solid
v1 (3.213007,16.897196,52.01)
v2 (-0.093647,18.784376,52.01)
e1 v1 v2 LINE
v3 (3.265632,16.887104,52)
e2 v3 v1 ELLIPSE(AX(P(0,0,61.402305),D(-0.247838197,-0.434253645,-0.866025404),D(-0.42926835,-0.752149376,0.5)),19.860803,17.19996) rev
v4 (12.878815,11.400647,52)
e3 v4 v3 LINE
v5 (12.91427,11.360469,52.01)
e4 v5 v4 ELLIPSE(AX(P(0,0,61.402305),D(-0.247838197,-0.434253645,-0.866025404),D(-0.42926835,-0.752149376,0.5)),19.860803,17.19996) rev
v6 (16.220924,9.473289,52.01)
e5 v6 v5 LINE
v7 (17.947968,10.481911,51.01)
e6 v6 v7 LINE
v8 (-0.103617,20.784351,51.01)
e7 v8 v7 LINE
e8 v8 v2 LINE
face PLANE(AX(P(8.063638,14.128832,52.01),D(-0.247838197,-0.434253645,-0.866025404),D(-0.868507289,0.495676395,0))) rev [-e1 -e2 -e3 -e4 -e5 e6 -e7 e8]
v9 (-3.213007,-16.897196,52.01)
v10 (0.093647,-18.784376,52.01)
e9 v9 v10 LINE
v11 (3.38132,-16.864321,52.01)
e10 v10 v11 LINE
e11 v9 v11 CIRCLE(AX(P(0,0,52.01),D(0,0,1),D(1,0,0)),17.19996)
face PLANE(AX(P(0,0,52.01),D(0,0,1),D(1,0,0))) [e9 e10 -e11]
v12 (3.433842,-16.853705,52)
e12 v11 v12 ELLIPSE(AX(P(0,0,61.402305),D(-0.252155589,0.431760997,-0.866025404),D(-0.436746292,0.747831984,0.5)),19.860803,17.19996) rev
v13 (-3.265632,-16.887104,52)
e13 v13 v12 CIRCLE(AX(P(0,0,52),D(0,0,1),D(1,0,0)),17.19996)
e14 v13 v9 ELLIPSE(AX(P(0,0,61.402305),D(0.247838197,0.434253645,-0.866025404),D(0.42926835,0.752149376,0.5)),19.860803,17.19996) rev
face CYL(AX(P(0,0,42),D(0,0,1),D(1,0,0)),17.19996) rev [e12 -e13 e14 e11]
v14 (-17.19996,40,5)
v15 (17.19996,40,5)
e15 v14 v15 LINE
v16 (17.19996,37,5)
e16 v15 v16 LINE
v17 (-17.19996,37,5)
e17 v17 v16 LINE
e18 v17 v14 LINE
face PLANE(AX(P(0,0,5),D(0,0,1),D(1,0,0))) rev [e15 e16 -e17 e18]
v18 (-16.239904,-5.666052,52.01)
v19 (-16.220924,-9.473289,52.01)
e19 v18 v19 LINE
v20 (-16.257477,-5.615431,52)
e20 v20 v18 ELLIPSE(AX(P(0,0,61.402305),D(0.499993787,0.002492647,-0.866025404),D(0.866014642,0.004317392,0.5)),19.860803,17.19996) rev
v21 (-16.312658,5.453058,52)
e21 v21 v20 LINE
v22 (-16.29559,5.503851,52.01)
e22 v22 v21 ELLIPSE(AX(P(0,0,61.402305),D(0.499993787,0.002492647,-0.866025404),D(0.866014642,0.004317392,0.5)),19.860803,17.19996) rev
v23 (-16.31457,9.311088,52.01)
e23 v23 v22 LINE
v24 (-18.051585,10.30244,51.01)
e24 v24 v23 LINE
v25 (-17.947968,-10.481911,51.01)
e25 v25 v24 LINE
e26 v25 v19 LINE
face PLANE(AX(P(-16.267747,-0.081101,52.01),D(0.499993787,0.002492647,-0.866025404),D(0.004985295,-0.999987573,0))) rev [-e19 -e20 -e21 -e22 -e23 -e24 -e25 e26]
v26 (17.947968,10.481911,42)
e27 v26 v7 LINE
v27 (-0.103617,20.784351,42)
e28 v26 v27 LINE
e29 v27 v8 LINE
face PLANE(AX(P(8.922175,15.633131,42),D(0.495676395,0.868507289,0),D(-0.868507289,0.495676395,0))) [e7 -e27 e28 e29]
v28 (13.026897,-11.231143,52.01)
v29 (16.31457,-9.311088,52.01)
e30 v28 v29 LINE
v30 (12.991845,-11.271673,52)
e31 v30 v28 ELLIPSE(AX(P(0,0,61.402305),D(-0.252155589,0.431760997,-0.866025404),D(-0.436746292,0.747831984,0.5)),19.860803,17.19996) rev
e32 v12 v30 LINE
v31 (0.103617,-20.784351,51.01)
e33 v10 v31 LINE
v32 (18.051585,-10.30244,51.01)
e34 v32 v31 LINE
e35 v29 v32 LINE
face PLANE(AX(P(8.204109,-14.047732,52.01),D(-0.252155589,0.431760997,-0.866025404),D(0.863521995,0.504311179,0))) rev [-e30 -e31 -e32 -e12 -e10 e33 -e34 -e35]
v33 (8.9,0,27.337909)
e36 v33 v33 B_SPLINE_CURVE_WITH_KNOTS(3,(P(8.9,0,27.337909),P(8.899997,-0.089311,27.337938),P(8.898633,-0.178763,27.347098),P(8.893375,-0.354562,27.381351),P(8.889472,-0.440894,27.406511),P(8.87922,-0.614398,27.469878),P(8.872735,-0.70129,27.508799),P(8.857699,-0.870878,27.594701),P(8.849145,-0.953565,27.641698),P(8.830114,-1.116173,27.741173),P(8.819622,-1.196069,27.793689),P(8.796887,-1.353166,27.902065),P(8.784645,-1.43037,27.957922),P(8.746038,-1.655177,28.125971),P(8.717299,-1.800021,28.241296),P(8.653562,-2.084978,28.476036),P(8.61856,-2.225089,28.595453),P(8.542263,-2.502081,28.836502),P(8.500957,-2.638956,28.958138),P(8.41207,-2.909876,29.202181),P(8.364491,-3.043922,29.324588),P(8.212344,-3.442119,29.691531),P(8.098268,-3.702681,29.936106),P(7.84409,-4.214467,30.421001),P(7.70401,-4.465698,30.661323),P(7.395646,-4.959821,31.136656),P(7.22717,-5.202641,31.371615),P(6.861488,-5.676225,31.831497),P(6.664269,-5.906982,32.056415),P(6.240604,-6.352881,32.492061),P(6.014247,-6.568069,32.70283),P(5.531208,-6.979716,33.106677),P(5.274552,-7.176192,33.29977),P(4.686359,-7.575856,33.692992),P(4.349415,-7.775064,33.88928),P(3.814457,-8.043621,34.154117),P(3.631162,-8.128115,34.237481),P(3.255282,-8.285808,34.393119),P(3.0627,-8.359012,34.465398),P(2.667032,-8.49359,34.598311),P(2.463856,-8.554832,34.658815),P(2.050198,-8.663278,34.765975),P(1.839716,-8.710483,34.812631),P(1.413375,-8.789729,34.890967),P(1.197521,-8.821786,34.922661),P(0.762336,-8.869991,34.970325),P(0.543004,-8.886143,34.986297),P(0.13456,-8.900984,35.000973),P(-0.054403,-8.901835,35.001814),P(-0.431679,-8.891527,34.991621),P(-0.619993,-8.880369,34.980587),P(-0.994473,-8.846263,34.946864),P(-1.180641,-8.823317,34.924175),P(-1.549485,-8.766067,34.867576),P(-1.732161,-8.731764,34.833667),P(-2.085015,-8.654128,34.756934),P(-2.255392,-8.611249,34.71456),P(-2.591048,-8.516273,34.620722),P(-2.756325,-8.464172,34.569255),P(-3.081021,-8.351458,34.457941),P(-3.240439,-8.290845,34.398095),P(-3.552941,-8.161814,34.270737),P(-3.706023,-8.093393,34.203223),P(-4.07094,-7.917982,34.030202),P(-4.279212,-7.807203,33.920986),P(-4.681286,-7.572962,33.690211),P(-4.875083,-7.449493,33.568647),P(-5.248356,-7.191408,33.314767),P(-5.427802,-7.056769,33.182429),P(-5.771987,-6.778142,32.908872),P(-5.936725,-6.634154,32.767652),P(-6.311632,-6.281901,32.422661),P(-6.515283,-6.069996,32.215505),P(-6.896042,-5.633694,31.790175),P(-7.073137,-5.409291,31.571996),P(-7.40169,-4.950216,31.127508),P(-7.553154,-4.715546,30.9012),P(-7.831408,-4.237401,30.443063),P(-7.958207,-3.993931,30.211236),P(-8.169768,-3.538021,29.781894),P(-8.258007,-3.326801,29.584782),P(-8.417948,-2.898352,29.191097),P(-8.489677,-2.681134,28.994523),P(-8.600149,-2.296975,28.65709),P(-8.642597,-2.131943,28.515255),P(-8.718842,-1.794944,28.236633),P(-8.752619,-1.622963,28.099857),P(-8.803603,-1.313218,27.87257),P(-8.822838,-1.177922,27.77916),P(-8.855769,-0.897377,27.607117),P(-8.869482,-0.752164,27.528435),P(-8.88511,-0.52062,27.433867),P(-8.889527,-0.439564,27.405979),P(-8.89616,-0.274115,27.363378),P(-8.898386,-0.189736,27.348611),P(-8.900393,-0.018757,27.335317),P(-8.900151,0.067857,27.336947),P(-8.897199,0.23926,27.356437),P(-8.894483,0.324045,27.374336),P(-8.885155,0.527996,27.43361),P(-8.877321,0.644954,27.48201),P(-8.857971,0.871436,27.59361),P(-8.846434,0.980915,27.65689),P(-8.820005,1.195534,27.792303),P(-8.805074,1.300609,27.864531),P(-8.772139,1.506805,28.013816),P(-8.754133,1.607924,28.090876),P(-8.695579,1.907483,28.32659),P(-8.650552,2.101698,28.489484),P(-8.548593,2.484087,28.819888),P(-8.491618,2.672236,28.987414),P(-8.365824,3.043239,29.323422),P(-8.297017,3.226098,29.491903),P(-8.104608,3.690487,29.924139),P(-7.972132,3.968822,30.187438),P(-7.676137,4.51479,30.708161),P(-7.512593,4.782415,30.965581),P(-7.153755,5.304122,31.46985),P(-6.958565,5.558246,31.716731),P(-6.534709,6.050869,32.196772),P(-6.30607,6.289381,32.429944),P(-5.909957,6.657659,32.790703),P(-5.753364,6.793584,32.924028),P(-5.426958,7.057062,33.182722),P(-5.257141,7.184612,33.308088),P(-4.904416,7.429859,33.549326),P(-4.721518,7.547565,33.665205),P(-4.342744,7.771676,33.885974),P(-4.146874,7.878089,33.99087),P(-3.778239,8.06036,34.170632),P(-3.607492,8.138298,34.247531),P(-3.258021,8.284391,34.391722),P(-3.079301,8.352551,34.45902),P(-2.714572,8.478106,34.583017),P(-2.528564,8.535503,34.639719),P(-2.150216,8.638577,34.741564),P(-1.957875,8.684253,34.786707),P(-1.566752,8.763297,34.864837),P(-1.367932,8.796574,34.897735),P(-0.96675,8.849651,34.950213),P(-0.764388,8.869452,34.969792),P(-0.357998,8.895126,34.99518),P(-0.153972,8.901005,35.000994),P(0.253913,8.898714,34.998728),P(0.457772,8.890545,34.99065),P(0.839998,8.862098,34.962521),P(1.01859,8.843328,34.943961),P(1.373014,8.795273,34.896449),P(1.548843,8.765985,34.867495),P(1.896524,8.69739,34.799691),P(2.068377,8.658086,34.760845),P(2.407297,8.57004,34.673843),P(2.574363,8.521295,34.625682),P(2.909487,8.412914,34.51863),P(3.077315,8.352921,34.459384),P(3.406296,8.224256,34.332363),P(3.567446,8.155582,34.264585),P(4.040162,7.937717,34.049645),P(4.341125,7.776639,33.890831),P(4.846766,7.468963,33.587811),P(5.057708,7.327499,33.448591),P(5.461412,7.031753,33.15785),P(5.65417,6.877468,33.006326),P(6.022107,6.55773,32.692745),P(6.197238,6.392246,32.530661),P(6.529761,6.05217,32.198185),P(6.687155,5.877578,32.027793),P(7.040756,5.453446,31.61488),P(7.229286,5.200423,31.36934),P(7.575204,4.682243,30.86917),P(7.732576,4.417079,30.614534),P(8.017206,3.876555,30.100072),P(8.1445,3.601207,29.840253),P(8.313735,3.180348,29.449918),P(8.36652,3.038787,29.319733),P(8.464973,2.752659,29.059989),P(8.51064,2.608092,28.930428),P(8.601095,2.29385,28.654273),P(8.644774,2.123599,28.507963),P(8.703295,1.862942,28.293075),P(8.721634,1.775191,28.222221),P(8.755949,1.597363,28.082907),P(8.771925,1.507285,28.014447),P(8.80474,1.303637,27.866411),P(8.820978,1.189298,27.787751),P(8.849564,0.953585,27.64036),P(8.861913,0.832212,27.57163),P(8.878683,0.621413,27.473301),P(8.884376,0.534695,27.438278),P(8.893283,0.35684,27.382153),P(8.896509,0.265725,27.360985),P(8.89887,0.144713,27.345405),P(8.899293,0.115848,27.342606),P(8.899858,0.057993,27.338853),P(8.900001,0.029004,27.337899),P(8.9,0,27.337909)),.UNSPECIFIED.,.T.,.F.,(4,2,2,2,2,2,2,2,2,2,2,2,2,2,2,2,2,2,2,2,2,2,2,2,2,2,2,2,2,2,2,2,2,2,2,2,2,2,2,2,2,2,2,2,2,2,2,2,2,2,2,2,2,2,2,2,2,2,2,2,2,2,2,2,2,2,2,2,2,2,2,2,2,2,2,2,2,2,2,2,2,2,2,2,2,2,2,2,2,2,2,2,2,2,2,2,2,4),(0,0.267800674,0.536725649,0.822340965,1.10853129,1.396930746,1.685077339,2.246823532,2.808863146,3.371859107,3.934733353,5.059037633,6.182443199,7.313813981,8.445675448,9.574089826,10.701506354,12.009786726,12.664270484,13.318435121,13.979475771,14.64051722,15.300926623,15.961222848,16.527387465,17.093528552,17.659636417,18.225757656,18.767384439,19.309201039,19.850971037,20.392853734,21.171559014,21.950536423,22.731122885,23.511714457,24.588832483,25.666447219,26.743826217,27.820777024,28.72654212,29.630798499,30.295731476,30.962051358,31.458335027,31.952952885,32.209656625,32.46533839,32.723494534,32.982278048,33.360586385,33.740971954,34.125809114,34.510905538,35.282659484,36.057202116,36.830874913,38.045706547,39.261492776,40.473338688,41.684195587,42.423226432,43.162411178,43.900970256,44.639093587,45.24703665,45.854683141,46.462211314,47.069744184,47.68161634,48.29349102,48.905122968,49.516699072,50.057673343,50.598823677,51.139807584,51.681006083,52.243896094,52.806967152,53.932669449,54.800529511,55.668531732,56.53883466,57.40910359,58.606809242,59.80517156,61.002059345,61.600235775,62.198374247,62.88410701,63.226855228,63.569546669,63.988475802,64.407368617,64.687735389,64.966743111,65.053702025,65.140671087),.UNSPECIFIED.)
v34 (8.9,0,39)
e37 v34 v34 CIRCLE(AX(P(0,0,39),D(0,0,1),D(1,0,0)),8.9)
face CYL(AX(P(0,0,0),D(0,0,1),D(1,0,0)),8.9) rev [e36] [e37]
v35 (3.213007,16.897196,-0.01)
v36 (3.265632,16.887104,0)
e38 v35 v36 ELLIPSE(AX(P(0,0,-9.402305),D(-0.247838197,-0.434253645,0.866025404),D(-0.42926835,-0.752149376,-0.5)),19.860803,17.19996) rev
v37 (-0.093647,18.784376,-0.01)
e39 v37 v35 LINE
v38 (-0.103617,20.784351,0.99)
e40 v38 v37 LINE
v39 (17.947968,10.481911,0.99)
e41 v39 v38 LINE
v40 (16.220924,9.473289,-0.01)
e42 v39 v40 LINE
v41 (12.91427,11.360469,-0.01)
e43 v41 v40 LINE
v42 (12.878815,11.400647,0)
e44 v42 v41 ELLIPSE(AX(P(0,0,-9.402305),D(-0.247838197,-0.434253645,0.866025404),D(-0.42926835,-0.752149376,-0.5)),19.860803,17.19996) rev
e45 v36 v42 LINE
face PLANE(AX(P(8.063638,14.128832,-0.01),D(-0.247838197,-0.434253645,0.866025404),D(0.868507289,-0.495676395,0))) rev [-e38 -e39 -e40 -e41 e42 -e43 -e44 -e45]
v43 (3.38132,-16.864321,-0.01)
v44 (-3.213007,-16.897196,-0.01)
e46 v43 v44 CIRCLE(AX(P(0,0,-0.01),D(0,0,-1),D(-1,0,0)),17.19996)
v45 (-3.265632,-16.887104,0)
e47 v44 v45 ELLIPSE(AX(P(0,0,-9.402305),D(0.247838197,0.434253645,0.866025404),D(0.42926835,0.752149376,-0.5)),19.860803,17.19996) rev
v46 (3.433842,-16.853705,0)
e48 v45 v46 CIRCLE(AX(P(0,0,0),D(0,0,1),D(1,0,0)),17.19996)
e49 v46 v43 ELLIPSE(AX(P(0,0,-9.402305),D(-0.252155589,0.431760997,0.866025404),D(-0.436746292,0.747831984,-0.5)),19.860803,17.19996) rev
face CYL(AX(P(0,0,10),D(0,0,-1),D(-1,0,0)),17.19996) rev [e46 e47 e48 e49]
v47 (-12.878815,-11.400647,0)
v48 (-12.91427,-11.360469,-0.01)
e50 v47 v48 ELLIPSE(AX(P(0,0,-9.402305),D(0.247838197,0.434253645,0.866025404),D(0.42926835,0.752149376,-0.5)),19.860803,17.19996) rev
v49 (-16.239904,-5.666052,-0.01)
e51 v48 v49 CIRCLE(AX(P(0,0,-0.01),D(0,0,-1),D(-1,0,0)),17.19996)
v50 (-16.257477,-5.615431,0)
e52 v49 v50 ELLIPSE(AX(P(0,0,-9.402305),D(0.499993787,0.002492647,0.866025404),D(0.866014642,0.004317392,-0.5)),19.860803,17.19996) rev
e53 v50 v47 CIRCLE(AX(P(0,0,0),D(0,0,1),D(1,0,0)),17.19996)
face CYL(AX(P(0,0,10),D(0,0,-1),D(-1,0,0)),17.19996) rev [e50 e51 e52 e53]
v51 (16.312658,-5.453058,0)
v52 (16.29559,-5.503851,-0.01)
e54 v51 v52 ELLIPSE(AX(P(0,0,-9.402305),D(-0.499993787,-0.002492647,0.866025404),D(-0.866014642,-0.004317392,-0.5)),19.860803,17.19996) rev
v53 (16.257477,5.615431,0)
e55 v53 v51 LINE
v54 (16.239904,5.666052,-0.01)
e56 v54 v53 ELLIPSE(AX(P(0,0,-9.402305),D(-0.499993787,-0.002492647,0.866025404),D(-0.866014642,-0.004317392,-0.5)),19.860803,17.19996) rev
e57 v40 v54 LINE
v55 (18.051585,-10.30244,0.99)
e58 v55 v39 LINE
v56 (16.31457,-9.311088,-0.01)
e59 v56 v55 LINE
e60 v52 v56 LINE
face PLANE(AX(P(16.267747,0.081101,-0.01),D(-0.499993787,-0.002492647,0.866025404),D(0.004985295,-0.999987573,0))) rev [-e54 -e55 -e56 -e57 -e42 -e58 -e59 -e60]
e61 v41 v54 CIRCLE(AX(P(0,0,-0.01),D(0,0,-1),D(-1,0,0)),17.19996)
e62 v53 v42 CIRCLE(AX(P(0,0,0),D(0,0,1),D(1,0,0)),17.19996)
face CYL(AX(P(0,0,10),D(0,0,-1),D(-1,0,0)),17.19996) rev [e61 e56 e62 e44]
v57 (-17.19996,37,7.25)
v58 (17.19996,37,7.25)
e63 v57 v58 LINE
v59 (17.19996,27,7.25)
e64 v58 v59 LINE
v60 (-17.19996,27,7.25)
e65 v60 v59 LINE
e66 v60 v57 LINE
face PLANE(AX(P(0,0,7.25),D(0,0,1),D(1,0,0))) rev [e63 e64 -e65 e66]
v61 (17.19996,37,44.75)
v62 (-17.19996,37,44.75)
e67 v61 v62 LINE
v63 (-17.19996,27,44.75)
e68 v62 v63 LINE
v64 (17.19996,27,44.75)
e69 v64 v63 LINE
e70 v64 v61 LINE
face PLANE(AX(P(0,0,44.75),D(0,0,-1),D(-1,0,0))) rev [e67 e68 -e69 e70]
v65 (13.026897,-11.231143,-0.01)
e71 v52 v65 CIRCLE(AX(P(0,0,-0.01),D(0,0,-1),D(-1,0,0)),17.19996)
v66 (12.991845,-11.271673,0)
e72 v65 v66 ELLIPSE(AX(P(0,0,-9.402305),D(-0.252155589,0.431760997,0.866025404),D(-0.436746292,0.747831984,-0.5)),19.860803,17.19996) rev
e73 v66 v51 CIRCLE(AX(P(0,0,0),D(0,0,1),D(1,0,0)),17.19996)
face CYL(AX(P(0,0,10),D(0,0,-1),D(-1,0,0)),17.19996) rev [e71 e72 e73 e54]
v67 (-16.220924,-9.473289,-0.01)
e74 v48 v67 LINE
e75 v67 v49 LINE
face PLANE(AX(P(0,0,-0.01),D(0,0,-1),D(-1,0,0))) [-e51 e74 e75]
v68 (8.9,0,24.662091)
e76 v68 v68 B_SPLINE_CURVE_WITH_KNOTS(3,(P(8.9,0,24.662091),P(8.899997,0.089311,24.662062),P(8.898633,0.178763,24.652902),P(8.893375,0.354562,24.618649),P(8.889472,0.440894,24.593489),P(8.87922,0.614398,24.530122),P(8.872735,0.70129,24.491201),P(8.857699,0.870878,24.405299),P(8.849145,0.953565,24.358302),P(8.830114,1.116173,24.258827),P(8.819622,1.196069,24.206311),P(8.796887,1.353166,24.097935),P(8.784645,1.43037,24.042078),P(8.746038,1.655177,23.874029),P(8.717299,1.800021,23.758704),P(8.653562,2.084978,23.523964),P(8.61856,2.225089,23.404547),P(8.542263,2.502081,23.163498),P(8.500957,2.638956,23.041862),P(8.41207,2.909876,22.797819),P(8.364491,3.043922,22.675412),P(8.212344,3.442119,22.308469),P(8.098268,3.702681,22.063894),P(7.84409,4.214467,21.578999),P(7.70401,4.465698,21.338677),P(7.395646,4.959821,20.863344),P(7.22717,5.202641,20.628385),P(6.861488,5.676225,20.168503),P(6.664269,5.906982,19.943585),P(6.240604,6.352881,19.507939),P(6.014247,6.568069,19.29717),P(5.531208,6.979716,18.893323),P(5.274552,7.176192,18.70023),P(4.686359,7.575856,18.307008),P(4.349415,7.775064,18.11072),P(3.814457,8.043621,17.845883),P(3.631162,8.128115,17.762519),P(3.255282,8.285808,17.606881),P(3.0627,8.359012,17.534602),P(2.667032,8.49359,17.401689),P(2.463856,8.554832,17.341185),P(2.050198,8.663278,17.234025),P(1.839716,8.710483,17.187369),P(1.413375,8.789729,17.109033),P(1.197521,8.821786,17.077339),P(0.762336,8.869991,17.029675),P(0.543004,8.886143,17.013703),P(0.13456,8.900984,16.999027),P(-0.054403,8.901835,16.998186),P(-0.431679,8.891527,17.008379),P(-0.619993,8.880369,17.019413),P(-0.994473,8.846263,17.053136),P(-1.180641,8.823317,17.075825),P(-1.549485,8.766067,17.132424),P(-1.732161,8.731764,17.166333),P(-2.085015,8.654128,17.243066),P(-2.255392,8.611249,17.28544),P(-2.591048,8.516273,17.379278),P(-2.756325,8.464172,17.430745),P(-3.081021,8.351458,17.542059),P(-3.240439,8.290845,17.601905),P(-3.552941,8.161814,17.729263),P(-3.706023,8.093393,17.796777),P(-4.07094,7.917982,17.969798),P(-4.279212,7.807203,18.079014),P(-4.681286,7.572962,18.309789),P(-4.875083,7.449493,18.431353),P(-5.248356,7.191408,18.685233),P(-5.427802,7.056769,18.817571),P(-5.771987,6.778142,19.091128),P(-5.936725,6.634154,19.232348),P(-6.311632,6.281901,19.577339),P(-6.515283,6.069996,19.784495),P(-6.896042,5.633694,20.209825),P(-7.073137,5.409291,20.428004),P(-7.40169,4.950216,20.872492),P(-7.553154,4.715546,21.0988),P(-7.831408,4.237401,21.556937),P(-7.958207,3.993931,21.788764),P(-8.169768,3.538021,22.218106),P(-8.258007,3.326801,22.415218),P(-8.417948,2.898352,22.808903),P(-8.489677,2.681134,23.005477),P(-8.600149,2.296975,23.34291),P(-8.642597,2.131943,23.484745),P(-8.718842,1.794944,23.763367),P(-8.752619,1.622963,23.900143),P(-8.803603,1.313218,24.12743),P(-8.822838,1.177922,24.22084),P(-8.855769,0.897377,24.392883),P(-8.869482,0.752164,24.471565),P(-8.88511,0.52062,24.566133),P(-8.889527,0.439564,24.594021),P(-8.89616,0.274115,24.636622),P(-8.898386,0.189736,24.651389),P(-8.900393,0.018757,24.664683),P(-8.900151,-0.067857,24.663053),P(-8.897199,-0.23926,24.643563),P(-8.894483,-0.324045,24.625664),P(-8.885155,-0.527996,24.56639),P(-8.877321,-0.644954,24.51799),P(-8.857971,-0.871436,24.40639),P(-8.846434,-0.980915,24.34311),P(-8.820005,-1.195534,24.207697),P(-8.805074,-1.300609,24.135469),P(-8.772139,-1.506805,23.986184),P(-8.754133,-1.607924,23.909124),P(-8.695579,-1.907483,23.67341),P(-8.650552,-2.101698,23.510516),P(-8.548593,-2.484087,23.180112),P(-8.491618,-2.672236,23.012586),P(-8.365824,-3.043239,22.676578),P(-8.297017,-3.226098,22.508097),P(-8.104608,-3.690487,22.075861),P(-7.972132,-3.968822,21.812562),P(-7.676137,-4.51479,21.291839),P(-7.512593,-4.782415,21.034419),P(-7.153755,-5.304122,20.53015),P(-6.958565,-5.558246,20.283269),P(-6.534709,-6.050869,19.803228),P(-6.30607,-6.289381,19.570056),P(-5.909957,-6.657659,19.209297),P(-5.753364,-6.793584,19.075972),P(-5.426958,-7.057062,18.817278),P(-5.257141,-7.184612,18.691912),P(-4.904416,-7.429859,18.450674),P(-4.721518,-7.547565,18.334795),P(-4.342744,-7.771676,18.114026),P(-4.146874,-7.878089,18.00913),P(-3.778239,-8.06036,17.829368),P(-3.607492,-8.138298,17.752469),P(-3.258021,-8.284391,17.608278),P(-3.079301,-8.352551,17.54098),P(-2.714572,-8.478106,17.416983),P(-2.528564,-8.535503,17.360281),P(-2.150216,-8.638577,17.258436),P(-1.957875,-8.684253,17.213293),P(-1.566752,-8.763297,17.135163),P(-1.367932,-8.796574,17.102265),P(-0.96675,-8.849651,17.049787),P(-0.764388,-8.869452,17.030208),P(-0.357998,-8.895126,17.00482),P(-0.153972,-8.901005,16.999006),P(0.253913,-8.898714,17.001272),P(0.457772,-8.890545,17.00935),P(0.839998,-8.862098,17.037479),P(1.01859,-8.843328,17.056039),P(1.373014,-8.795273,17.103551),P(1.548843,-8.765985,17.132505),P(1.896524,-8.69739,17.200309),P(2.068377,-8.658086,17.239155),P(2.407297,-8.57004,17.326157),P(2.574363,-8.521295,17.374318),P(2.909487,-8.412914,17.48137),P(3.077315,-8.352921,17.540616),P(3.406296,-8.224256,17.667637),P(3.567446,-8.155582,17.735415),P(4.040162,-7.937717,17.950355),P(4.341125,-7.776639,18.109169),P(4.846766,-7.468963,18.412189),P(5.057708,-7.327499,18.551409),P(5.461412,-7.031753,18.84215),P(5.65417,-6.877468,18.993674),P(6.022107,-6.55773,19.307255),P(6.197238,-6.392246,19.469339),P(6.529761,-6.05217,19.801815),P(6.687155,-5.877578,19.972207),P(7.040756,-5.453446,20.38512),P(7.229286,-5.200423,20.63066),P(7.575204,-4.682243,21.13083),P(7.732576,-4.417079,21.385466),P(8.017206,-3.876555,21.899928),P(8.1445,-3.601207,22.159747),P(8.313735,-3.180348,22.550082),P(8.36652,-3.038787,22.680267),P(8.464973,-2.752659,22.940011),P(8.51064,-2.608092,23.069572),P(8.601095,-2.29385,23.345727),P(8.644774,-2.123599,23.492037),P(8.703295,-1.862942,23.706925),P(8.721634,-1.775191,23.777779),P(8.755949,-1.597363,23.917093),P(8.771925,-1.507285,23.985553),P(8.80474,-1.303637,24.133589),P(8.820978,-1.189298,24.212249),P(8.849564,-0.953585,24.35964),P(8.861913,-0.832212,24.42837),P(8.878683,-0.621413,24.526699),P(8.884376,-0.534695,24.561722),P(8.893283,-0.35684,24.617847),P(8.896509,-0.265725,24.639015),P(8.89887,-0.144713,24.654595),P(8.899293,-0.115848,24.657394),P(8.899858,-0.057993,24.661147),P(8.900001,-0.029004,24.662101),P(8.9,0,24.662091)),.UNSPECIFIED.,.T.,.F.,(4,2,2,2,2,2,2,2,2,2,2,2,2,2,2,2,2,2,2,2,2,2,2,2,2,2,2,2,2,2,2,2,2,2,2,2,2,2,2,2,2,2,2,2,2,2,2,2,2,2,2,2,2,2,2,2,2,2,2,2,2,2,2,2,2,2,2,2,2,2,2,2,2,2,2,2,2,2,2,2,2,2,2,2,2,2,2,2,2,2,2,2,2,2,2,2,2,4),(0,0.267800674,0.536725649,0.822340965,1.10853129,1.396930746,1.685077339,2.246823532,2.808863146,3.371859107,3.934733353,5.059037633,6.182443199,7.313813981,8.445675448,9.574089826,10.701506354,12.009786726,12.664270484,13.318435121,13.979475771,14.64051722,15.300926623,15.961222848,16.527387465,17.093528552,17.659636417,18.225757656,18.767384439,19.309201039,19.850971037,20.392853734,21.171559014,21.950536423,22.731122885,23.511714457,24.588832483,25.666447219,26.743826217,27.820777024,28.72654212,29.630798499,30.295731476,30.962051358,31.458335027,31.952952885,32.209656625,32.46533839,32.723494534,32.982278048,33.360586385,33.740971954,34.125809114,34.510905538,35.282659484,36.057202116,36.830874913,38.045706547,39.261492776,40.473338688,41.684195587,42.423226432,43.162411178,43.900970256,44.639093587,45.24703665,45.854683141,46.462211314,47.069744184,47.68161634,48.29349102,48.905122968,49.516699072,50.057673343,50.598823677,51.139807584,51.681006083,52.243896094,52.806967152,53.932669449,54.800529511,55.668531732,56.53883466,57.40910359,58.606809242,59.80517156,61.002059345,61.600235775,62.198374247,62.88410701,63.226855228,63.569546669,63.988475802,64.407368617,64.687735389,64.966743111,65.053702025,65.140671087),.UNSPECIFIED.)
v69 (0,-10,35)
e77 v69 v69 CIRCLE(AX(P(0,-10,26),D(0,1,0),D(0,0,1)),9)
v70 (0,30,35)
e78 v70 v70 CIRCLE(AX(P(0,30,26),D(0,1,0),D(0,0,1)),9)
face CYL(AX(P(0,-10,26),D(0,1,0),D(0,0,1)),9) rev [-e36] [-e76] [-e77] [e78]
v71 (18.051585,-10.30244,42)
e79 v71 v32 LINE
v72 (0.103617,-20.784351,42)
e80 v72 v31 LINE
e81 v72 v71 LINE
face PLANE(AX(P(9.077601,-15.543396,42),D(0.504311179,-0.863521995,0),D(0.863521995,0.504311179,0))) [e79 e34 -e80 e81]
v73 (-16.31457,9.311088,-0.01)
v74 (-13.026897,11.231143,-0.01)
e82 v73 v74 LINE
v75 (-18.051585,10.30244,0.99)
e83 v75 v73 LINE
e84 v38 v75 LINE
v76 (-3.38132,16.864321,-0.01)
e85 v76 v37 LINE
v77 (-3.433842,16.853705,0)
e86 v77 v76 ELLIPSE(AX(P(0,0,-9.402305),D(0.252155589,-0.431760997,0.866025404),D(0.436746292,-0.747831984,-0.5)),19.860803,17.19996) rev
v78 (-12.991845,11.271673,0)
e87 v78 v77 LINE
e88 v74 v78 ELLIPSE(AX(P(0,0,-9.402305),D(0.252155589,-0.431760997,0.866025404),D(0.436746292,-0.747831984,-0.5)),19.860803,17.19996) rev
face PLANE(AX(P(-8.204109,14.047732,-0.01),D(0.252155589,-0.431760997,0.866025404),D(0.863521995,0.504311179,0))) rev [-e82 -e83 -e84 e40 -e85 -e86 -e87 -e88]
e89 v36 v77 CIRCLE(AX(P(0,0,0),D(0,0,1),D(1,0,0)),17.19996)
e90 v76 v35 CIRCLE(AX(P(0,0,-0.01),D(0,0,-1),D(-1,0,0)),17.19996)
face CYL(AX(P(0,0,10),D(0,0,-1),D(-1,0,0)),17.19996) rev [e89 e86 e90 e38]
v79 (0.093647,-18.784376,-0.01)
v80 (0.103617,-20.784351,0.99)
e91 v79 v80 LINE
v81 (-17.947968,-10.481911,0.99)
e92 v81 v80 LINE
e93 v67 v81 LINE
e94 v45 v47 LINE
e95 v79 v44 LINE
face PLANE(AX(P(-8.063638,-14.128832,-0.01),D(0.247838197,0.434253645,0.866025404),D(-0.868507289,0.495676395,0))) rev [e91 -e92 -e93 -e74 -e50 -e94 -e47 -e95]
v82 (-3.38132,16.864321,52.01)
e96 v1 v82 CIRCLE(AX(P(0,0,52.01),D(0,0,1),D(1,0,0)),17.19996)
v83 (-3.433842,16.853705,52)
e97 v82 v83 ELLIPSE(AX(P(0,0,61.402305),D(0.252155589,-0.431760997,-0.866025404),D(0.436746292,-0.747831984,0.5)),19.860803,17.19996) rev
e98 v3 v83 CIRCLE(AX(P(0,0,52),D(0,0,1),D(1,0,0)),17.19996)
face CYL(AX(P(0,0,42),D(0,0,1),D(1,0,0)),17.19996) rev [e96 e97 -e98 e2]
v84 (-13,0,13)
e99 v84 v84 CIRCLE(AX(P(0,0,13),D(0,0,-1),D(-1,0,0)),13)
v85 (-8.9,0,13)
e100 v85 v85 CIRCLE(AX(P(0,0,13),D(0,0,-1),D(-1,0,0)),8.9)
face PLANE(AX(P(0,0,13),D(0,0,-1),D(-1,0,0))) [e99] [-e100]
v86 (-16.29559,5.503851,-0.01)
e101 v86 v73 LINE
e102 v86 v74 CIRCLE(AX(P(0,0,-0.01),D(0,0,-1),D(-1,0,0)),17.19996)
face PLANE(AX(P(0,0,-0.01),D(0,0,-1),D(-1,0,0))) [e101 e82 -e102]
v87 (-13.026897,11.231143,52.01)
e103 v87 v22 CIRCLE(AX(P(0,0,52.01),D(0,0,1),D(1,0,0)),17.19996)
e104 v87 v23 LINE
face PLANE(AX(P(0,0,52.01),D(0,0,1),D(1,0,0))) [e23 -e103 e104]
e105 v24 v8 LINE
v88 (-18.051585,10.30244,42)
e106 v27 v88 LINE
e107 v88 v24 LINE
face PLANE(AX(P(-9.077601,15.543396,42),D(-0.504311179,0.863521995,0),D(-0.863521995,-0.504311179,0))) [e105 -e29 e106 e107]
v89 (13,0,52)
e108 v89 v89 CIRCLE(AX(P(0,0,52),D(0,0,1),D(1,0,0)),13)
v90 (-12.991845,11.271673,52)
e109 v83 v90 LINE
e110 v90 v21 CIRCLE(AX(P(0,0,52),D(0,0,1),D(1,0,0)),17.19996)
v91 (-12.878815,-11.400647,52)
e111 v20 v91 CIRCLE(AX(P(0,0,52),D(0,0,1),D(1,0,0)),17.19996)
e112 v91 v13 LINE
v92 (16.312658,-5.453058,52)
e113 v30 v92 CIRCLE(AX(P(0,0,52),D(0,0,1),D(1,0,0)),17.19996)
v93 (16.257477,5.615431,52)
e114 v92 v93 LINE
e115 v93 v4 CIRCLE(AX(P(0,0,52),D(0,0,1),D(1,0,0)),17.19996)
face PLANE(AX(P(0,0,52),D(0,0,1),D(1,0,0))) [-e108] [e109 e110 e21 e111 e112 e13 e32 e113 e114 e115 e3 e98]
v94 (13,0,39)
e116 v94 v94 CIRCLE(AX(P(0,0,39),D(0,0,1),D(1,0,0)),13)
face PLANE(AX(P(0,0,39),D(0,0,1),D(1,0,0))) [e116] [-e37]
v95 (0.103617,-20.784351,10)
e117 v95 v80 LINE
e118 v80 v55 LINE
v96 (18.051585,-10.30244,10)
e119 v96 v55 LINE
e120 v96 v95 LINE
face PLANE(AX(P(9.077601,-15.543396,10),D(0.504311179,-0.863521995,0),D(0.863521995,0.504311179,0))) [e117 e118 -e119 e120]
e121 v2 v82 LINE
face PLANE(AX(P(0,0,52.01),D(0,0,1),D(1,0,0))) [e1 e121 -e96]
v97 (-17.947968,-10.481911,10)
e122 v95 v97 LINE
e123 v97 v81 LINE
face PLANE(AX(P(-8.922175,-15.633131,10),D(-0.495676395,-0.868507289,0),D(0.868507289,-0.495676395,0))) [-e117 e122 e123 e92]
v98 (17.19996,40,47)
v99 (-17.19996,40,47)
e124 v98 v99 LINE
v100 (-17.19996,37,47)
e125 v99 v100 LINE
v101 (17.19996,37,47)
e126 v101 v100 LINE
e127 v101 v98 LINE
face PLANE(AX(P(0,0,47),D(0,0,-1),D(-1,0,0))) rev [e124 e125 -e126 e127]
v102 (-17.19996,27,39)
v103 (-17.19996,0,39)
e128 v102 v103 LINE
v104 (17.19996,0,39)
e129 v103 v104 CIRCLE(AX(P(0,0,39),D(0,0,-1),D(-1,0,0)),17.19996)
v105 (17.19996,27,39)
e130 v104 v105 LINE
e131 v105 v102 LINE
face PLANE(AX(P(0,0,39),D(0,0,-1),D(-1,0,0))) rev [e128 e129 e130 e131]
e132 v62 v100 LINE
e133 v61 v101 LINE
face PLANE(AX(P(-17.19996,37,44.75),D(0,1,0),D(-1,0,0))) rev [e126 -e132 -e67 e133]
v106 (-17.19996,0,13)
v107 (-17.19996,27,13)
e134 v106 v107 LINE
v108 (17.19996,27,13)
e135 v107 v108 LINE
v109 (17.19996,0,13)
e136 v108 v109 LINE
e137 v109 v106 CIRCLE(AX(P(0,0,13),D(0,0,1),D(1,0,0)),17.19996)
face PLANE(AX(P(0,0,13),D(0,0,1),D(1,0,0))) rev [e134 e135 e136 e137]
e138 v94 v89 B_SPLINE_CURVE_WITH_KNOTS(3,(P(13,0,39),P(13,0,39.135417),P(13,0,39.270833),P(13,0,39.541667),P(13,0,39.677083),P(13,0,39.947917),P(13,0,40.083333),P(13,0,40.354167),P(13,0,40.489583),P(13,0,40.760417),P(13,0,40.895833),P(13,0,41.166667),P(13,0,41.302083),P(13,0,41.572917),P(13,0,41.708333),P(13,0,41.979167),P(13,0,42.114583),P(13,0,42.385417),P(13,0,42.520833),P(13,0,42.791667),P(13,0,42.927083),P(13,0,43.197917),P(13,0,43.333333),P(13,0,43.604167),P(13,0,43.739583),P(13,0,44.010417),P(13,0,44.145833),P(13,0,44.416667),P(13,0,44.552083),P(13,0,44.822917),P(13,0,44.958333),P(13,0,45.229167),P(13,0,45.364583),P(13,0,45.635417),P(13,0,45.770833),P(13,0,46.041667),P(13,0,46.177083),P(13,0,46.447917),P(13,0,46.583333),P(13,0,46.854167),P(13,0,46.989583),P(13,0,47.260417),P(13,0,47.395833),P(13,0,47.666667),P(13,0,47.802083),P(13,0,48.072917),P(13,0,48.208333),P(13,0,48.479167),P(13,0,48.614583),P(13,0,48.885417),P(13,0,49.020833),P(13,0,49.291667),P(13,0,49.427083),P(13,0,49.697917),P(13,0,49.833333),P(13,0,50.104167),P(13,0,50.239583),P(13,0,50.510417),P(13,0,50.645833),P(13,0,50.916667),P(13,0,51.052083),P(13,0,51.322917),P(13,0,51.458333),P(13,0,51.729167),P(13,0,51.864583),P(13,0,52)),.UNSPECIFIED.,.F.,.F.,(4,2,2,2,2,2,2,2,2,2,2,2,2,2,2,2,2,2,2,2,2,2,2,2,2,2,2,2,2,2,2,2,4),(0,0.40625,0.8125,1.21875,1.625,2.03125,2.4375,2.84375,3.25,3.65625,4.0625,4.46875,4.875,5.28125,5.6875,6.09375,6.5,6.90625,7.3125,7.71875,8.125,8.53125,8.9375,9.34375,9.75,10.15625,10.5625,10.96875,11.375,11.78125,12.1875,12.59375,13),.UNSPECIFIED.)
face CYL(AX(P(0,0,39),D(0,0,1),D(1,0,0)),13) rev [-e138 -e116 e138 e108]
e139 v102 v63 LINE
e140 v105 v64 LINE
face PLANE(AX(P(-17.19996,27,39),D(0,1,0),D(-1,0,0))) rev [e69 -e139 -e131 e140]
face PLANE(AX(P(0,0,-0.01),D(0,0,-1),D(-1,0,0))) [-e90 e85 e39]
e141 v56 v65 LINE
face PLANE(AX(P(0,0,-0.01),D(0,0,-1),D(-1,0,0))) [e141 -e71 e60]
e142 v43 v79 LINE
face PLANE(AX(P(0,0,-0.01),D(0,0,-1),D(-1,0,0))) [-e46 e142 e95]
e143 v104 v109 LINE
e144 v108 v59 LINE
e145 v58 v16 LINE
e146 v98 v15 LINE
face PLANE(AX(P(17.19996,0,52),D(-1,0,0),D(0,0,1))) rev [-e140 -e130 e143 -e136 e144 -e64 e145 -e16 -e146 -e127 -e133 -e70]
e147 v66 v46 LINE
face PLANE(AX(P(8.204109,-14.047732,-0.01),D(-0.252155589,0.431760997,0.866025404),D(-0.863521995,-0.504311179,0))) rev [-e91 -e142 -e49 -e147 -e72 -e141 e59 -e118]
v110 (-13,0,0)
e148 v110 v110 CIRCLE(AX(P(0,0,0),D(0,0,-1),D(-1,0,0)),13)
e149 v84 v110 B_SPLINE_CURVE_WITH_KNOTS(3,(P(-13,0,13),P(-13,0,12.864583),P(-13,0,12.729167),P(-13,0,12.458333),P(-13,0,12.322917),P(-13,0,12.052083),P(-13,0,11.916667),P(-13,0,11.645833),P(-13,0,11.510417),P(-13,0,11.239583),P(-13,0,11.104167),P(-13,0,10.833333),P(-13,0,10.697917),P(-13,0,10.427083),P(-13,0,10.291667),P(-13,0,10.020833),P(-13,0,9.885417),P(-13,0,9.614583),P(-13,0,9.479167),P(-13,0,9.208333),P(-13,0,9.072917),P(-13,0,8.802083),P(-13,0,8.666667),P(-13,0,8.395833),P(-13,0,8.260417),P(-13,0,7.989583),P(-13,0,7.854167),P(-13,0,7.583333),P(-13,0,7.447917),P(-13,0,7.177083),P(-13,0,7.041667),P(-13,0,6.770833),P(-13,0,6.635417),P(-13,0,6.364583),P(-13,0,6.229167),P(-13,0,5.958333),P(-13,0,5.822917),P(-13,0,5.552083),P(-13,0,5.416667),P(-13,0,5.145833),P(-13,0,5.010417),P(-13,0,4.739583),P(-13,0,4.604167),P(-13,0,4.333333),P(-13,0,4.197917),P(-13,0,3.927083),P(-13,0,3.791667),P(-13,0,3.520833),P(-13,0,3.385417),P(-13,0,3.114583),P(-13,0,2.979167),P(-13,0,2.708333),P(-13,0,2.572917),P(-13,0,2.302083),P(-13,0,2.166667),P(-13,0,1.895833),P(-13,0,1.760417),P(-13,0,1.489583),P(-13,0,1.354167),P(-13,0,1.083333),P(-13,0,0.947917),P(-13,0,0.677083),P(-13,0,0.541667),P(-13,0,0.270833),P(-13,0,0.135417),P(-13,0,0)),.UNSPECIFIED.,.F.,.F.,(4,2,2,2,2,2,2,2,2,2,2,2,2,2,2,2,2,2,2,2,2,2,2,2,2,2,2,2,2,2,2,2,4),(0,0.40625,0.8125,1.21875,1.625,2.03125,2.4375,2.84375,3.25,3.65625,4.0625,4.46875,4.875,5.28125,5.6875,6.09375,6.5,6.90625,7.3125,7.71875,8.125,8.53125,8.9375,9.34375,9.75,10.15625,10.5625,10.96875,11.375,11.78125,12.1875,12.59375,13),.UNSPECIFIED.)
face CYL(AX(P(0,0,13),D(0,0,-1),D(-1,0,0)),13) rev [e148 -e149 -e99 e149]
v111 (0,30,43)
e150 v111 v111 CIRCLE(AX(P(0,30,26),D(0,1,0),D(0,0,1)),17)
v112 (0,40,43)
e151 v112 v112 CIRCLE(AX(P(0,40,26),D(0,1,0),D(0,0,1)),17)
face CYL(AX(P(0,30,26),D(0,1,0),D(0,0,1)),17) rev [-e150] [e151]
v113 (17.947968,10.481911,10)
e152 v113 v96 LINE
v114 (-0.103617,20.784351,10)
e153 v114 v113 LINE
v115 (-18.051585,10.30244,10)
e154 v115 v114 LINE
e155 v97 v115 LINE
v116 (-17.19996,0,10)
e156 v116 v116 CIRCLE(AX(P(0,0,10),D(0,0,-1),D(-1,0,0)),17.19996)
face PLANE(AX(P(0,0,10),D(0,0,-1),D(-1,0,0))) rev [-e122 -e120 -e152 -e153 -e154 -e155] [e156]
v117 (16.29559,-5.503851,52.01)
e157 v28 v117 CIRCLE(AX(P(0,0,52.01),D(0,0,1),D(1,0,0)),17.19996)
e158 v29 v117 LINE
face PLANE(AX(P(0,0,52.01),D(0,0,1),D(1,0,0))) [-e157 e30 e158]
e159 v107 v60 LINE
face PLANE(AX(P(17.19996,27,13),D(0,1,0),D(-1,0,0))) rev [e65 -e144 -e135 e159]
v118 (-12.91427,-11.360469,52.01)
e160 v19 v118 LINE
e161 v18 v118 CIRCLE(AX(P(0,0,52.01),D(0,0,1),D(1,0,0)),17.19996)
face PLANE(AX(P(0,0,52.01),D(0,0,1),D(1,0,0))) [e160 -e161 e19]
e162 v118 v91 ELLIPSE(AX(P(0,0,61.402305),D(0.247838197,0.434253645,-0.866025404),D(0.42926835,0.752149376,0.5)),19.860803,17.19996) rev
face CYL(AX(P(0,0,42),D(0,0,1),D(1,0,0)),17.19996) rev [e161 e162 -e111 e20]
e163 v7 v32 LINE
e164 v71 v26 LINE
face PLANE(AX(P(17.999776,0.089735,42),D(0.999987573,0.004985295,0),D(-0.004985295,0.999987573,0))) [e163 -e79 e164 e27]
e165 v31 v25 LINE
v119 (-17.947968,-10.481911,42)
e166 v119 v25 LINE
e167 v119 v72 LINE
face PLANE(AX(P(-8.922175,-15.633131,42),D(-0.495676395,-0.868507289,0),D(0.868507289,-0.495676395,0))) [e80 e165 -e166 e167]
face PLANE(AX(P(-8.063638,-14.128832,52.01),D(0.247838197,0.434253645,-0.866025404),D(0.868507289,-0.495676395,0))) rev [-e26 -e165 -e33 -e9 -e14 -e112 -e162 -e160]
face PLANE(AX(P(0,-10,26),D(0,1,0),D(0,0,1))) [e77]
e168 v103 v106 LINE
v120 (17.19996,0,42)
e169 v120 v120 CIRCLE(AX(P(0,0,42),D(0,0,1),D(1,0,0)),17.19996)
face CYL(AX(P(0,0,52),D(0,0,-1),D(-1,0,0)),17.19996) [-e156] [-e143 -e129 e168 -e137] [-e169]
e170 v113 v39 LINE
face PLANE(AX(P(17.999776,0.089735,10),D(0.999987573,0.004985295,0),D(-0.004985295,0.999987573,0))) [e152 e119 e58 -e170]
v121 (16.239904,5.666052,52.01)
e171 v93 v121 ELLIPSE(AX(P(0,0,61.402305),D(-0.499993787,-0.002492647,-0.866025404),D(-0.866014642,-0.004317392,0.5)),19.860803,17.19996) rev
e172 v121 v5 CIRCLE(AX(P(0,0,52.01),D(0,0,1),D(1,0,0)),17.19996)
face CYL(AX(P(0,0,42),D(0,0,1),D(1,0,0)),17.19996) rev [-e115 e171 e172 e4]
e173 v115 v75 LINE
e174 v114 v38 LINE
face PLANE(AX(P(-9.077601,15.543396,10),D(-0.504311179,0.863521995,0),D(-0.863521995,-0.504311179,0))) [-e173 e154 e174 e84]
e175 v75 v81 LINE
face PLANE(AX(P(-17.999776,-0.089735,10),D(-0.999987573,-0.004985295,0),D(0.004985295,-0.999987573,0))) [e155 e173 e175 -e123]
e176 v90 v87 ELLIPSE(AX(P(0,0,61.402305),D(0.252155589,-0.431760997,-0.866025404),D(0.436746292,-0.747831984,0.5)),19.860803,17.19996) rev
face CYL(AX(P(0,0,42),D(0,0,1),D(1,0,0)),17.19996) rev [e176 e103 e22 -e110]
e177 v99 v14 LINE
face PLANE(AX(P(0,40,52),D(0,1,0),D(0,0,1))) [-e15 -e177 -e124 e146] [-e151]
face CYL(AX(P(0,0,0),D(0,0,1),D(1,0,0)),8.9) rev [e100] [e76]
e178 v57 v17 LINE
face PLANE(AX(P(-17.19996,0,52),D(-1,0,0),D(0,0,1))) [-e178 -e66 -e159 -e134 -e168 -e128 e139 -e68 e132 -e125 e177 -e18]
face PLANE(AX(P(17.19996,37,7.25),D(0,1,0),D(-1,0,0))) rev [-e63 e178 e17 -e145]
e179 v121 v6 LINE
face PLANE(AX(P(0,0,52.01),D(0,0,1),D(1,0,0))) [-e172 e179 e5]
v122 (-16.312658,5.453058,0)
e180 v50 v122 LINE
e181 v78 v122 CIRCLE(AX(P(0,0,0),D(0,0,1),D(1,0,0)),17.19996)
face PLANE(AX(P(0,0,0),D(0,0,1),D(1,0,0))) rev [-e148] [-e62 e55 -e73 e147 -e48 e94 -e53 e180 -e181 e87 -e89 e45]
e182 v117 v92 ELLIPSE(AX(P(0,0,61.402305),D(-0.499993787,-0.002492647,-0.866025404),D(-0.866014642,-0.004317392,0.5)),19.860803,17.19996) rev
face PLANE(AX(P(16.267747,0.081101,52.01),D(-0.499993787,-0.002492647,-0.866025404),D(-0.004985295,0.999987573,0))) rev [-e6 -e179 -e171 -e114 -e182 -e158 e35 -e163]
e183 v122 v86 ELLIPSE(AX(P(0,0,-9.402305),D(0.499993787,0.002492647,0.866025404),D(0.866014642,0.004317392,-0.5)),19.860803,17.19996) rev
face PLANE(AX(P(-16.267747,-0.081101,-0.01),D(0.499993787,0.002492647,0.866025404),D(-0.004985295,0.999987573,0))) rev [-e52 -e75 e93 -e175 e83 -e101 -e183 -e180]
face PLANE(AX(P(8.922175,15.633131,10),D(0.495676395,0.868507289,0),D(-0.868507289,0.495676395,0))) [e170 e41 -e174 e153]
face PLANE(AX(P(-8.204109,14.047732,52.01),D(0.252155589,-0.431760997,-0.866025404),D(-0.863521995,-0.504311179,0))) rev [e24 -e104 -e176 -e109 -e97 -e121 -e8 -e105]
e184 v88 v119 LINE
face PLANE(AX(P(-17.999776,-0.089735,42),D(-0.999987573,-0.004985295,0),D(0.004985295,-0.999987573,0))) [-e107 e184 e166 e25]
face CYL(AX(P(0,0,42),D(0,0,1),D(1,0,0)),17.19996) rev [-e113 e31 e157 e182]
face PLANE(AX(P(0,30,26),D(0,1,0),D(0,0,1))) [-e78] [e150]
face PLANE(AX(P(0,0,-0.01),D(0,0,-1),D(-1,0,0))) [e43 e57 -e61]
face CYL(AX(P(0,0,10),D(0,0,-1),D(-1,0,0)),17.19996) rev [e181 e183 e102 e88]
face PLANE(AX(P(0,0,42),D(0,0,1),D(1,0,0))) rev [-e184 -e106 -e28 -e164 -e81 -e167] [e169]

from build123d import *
from build123d.topology import SkipClean

# Parameters (mm, degrees)
SKETCH2_R                = 17.199960221
SKETCH2_R_2              = 12.422193493
SKETCH2_R_3              = 8.504424776
BOSS_EXTRUDE2_DEPTH      = 52
SKETCH4_R                = 13
CUT_EXTRUDE1_DEPTH       = 13
CUT_EXTRUDE2_START       = -13
SKETCH5_R                = 13
CUT_EXTRUDE2_DEPTH       = 13
SKETCH6_R                = 8.9
CUT_EXTRUDE3_DEPTH       = 59.45373069
CUT_EXTRUDE4_DEPTH       = 5
CUT_EXTRUDE5_START       = -5
CUT_EXTRUDE5_DEPTH       = 5
CUT_EXTRUDE6_START       = -2.25
CUT_EXTRUDE6_DEPTH       = 2.25
CUT_EXTRUDE7_DEPTH       = 2.25
CUT_EXTRUDE9_START       = -5.75
CUT_EXTRUDE9_DEPTH       = 5.75
CUT_EXTRUDE10_DEPTH      = 5.75
BOSS_EXTRUDE3_DEPTH      = 0.01
BOSS_EXTRUDE3_DEPTH_BACK = 10
SKETCH13_R               = 17.199960221
BOSS_EXTRUDE4_DEPTH      = 0.01
BOSS_EXTRUDE4_DEPTH_BACK = 10
SKETCH15_R               = 17.199960221
SKETCH16_R               = 17
CUT_EXTRUDE11_DEPTH      = 10
SKETCH17_R               = 9
CUT_EXTRUDE12_DEPTH      = 40
CHAMFER3_SIZE            = 1
CHAMFER3_SIZE_2          = 1.732050808


with BuildPart() as part:
    # Sketch2 → Boss-Extrude2 (new body)
    # profile 1 of 3: a face of its own
    with BuildSketch(Plane.XY):
        with BuildLine():
            Line((17.199960221, 40), (-17.199960221, 40))
            Line((-17.199960221, 40), (-17.199960221, 0))
            ThreePointArc((-17.199960221, 0), (0, 17.199960221), (17.199960221, 0))
            Line((17.199960221, 0), (17.199960221, 40))
        make_face()
    # profile 2 of 3: a face of its own
    with BuildSketch(Plane.XY):
        Circle(SKETCH2_R)
        Circle(SKETCH2_R_2, mode=Mode.SUBTRACT)
    # profile 3 of 3: a face of its own
    with BuildSketch(Plane.XY):
        Circle(SKETCH2_R_2)
        with Locations(Location((0, 0, 0), (0, 0, 180))):
            Circle(SKETCH2_R_3, mode=Mode.SUBTRACT)
    extrude(amount=BOSS_EXTRUDE2_DEPTH)

    # Sketch4 → Cut-Extrude1 (cut)
    with BuildSketch(Plane(origin=(0, 0, 0), x_dir=(-1, 0, 0), z_dir=(0, 0, -1))):
        Circle(SKETCH4_R)
    extrude(amount=-CUT_EXTRUDE1_DEPTH, mode=Mode.SUBTRACT)

    # Sketch5 → Cut-Extrude2 (cut)
    with BuildSketch(Plane.XY.offset(52).offset(CUT_EXTRUDE2_START)):
        with Locations(Location((0, 0, 0), (0, 0, 180))):
            Circle(SKETCH5_R)
    extrude(amount=CUT_EXTRUDE2_DEPTH, mode=Mode.SUBTRACT)

    # Sketch6 → Cut-Extrude3 (cut, through all)
    with BuildSketch(Plane.XY.offset(39)):
        Circle(SKETCH6_R)
    extrude(amount=-CUT_EXTRUDE3_DEPTH, mode=Mode.SUBTRACT)

    # Sketch7 → Cut-Extrude4 (cut)
    with BuildSketch(Plane(origin=(0, 0, 0), x_dir=(-1, 0, 0), z_dir=(0, 0, -1))):
        with BuildLine():
            Line((-17.199960221, 0), (-17.199960221, 40))
            Line((-17.199960221, 40), (17.199960221, 40))
            Line((17.199960221, 40), (17.199960221, 0))
            ThreePointArc((17.199960221, 0), (0, 17.199960221), (-17.199960221, 0))
        make_face()
    extrude(amount=-CUT_EXTRUDE4_DEPTH, mode=Mode.SUBTRACT)

    # Sketch8 → Cut-Extrude5 (cut)
    with BuildSketch(Plane.XY.offset(52).offset(CUT_EXTRUDE5_START)):
        with BuildLine():
            Line((-17.199960221, 0), (-17.199960221, 40))
            Line((-17.199960221, 40), (17.199960221, 40))
            Line((17.199960221, 40), (17.199960221, 0))
            ThreePointArc((17.199960221, 0), (0, 17.199960221), (-17.199960221, 0))
        make_face()
    extrude(amount=CUT_EXTRUDE5_DEPTH, mode=Mode.SUBTRACT)

    # Sketch9 → Cut-Extrude6 (cut)
    with BuildSketch(Plane.XY.offset(47).offset(CUT_EXTRUDE6_START)):
        with BuildLine():
            Line((-17.199960221, 37), (17.199960221, 37))
            Line((17.199960221, 37), (17.199960221, 0))
            ThreePointArc((17.199960221, 0), (0, 17.199960221), (-17.199960221, 0))
            Line((-17.199960221, 0), (-17.199960221, 37))
        make_face()
    extrude(amount=CUT_EXTRUDE6_DEPTH, mode=Mode.SUBTRACT)

    # Sketch10 → Cut-Extrude7 (cut)
    with SkipClean():  # the faces are left unmerged after this step: merging them gives an invalid solid
        with BuildSketch(Plane(origin=(0, 0, 5), x_dir=(-1, 0, 0), z_dir=(0, 0, -1))):
            with BuildLine():
                Line((-17.199960221, 37), (17.199960221, 37))
                Line((17.199960221, 37), (17.199960221, 0))
                ThreePointArc((17.199960221, 0), (0, 17.199960221), (-17.199960221, 0))
                Line((-17.199960221, 0), (-17.199960221, 37))
            make_face()
        extrude(amount=-CUT_EXTRUDE7_DEPTH, mode=Mode.SUBTRACT)
    add(part.part.scale(1), mode=Mode.REPLACE)  # the faces are merged on a copy

    # Sketch11 → Cut-Extrude9 (cut)
    with BuildSketch(Plane.XY.offset(44.75).offset(CUT_EXTRUDE9_START)):
        with BuildLine():
            Line((-17.199960221, 27), (17.199960221, 27))
            Line((17.199960221, 27), (17.199960221, 0))
            ThreePointArc((17.199960221, 0), (0, 17.199960221), (-17.199960221, 0))
            Line((-17.199960221, 0), (-17.199960221, 27))
        make_face()
    extrude(amount=CUT_EXTRUDE9_DEPTH, mode=Mode.SUBTRACT)

    # Sketch12 → Cut-Extrude10 (cut)
    with BuildSketch(Plane(origin=(0, 0, 7.25), x_dir=(-1, 0, 0), z_dir=(0, 0, -1))):
        with BuildLine():
            Line((-17.199960221, 27), (17.199960221, 27))
            Line((17.199960221, 27), (17.199960221, 0))
            ThreePointArc((17.199960221, 0), (0, 17.199960221), (-17.199960221, 0))
            Line((-17.199960221, 0), (-17.199960221, 27))
        make_face()
    extrude(amount=-CUT_EXTRUDE10_DEPTH, mode=Mode.SUBTRACT)

    # Sketch13 → Boss-Extrude3 (add, two sides: drawn at the far end of the back side and taken through both)
    with BuildSketch(Plane(origin=(0, 0, 0), x_dir=(-1, 0, 0), z_dir=(0, 0, -1)).offset(-BOSS_EXTRUDE3_DEPTH_BACK)):
        Polygon((-0.103617408, -20.784351408), (17.947967616, -10.481911012), (18.051585024, 10.302440396), (0.103617408, 20.784351408), (0, 20.725214652), (-17.947967616, 10.481911012), (-18.051585024, -10.302440396), align=None)
        Circle(SKETCH13_R, mode=Mode.SUBTRACT)
    extrude(amount=BOSS_EXTRUDE3_DEPTH + BOSS_EXTRUDE3_DEPTH_BACK)

    # Sketch15 → Boss-Extrude4 (add, two sides: drawn at the far end of the back side and taken through both)
    with BuildSketch(Plane.XY.offset(52).offset(-BOSS_EXTRUDE4_DEPTH_BACK)):
        Polygon((-18.051585024, 10.302440396), (-17.947967616, -10.481911012), (0.103617408, -20.784351408), (18.051585024, -10.302440396), (17.947967616, 10.481911012), (-0.103617408, 20.784351408), align=None)
        with Locations(Location((0, 0, 0), (0, 0, 180))):
            Circle(SKETCH15_R, mode=Mode.SUBTRACT)
    extrude(amount=BOSS_EXTRUDE4_DEPTH + BOSS_EXTRUDE4_DEPTH_BACK)

    # Sketch16 → Cut-Extrude11 (cut)
    with BuildSketch(Plane(origin=(0, 40, 0), x_dir=(1, 0, 0), z_dir=(0, 1, 0))):
        with Locations(Location((0, -26, 0), (0, 0, 270))):
            Circle(SKETCH16_R)
    extrude(amount=-CUT_EXTRUDE11_DEPTH, mode=Mode.SUBTRACT)

    # Sketch17 → Cut-Extrude12 (cut)
    with BuildSketch(Plane(origin=(0, 30, 0), x_dir=(1, 0, 0), z_dir=(0, 1, 0))):
        with Locations(Location((0, -26, 0), (0, 0, 270))):
            Circle(SKETCH17_R)
    extrude(amount=-CUT_EXTRUDE12_DEPTH, mode=Mode.SUBTRACT)

    # Chamfer3
    # the kernel refuses this chamfer: 1.732050808, 1 mm, written as the material it takes off along each edge
    with BuildSketch(Plane(origin=(21.92099597, -8.042640174, -0.01), x_dir=(0.029196521986656933, -0.04999262353370063, 0.9983227437537924), z_dir=(-0.8635219945420718, -0.5043111786804675, 0)), Plane(origin=(3.99536728, -23.005459473, -0.01), x_dir=(-0.028696620988686708, -0.050281241509443776, 0.9983227437537926), z_dir=(-0.8685072894207939, 0.4956763946598076, 0)), Plane(origin=(-17.925628689, -14.962819299, -0.01), x_dir=(-0.05789314297534289, -0.0002886179757454726, 0.9983227437537926), z_dir=(-0.004985294878722003, 0.9999875733402752, 0)), Plane(origin=(-21.92099597, 8.042640174, -0.01), x_dir=(-0.029196521986655326, 0.04999262353369786, 0.9983227437537926), z_dir=(0.8635219945420716, 0.5043111786804677, 0)), Plane(origin=(17.925628689, 14.962819299, -0.01), x_dir=(0.05789314297534289, 0.0002886179757454726, 0.9983227437537926), z_dir=(0.004985294878722003, -0.9999875733402752, 0)), Plane(origin=(-18.073923951, 14.783348683, 52.01), x_dir=(-0.05789314297534298, -0.00028861797574591844, -0.9983227437537926), z_dir=(0.004985294878729695, -0.9999875733402751, 0)), Plane(origin=(-21.839717488, -8.260802946, 52.01), x_dir=(-0.028696620988686607, -0.05028124150944443, -0.9983227437537926), z_dir=(0.8685072894207975, -0.49567639465980146, 0)), Plane(origin=(-3.765793537, -23.044151629, 52.01), x_dir=(0.02919652198665585, -0.04999262353369789, -0.9983227437537927), z_dir=(0.8635219945420678, 0.5043111786804741, 0)), Plane(origin=(18.073923951, -14.783348683, 52.01), x_dir=(0.057893142975342975, 0.00028861797574592825, -0.9983227437537926), z_dir=(-0.004985294878729864, 0.9999875733402751, 0)), Plane(origin=(21.839717488, 8.260802946, 52.01), x_dir=(0.02869662098868756, 0.050281241509446094, -0.9983227437537926), z_dir=(-0.8685072894207974, 0.4956763946598015, 0)), Plane(origin=(3.765793537, 23.044151629, 52.01), x_dir=(-0.029196521986655923, 0.04999262353369809, -0.9983227437537926), z_dir=(-0.8635219945420681, -0.5043111786804736, 0))) as chamfer3_piece_1:
        Polygon((CHAMFER3_SIZE * 0.998322743754, CHAMFER3_SIZE * 0.0578938624027), (-CHAMFER3_SIZE_2 * 0.0578938623883, CHAMFER3_SIZE_2 * 0.998322743505), (0, 0), align=None)
    extrude(amount=29.746537632, mode=Mode.SUBTRACT)
    with BuildSketch(Plane(origin=(21.839717488, 8.260802946, -0.01), x_dir=(0.02869662098868796, 0.05028124150944598, 0.9983227437537924), z_dir=(-0.8685072894207939, 0.4956763946598075, 0))) as chamfer3_piece_2:
        Polygon((CHAMFER3_SIZE * 0.998322743754, -CHAMFER3_SIZE * 0.0578938624027), (-CHAMFER3_SIZE_2 * 0.0578938623883, -CHAMFER3_SIZE_2 * 0.998322743505), (0, 0), align=None)
    extrude(amount=29.746537632, mode=Mode.SUBTRACT)


solid = part.part
